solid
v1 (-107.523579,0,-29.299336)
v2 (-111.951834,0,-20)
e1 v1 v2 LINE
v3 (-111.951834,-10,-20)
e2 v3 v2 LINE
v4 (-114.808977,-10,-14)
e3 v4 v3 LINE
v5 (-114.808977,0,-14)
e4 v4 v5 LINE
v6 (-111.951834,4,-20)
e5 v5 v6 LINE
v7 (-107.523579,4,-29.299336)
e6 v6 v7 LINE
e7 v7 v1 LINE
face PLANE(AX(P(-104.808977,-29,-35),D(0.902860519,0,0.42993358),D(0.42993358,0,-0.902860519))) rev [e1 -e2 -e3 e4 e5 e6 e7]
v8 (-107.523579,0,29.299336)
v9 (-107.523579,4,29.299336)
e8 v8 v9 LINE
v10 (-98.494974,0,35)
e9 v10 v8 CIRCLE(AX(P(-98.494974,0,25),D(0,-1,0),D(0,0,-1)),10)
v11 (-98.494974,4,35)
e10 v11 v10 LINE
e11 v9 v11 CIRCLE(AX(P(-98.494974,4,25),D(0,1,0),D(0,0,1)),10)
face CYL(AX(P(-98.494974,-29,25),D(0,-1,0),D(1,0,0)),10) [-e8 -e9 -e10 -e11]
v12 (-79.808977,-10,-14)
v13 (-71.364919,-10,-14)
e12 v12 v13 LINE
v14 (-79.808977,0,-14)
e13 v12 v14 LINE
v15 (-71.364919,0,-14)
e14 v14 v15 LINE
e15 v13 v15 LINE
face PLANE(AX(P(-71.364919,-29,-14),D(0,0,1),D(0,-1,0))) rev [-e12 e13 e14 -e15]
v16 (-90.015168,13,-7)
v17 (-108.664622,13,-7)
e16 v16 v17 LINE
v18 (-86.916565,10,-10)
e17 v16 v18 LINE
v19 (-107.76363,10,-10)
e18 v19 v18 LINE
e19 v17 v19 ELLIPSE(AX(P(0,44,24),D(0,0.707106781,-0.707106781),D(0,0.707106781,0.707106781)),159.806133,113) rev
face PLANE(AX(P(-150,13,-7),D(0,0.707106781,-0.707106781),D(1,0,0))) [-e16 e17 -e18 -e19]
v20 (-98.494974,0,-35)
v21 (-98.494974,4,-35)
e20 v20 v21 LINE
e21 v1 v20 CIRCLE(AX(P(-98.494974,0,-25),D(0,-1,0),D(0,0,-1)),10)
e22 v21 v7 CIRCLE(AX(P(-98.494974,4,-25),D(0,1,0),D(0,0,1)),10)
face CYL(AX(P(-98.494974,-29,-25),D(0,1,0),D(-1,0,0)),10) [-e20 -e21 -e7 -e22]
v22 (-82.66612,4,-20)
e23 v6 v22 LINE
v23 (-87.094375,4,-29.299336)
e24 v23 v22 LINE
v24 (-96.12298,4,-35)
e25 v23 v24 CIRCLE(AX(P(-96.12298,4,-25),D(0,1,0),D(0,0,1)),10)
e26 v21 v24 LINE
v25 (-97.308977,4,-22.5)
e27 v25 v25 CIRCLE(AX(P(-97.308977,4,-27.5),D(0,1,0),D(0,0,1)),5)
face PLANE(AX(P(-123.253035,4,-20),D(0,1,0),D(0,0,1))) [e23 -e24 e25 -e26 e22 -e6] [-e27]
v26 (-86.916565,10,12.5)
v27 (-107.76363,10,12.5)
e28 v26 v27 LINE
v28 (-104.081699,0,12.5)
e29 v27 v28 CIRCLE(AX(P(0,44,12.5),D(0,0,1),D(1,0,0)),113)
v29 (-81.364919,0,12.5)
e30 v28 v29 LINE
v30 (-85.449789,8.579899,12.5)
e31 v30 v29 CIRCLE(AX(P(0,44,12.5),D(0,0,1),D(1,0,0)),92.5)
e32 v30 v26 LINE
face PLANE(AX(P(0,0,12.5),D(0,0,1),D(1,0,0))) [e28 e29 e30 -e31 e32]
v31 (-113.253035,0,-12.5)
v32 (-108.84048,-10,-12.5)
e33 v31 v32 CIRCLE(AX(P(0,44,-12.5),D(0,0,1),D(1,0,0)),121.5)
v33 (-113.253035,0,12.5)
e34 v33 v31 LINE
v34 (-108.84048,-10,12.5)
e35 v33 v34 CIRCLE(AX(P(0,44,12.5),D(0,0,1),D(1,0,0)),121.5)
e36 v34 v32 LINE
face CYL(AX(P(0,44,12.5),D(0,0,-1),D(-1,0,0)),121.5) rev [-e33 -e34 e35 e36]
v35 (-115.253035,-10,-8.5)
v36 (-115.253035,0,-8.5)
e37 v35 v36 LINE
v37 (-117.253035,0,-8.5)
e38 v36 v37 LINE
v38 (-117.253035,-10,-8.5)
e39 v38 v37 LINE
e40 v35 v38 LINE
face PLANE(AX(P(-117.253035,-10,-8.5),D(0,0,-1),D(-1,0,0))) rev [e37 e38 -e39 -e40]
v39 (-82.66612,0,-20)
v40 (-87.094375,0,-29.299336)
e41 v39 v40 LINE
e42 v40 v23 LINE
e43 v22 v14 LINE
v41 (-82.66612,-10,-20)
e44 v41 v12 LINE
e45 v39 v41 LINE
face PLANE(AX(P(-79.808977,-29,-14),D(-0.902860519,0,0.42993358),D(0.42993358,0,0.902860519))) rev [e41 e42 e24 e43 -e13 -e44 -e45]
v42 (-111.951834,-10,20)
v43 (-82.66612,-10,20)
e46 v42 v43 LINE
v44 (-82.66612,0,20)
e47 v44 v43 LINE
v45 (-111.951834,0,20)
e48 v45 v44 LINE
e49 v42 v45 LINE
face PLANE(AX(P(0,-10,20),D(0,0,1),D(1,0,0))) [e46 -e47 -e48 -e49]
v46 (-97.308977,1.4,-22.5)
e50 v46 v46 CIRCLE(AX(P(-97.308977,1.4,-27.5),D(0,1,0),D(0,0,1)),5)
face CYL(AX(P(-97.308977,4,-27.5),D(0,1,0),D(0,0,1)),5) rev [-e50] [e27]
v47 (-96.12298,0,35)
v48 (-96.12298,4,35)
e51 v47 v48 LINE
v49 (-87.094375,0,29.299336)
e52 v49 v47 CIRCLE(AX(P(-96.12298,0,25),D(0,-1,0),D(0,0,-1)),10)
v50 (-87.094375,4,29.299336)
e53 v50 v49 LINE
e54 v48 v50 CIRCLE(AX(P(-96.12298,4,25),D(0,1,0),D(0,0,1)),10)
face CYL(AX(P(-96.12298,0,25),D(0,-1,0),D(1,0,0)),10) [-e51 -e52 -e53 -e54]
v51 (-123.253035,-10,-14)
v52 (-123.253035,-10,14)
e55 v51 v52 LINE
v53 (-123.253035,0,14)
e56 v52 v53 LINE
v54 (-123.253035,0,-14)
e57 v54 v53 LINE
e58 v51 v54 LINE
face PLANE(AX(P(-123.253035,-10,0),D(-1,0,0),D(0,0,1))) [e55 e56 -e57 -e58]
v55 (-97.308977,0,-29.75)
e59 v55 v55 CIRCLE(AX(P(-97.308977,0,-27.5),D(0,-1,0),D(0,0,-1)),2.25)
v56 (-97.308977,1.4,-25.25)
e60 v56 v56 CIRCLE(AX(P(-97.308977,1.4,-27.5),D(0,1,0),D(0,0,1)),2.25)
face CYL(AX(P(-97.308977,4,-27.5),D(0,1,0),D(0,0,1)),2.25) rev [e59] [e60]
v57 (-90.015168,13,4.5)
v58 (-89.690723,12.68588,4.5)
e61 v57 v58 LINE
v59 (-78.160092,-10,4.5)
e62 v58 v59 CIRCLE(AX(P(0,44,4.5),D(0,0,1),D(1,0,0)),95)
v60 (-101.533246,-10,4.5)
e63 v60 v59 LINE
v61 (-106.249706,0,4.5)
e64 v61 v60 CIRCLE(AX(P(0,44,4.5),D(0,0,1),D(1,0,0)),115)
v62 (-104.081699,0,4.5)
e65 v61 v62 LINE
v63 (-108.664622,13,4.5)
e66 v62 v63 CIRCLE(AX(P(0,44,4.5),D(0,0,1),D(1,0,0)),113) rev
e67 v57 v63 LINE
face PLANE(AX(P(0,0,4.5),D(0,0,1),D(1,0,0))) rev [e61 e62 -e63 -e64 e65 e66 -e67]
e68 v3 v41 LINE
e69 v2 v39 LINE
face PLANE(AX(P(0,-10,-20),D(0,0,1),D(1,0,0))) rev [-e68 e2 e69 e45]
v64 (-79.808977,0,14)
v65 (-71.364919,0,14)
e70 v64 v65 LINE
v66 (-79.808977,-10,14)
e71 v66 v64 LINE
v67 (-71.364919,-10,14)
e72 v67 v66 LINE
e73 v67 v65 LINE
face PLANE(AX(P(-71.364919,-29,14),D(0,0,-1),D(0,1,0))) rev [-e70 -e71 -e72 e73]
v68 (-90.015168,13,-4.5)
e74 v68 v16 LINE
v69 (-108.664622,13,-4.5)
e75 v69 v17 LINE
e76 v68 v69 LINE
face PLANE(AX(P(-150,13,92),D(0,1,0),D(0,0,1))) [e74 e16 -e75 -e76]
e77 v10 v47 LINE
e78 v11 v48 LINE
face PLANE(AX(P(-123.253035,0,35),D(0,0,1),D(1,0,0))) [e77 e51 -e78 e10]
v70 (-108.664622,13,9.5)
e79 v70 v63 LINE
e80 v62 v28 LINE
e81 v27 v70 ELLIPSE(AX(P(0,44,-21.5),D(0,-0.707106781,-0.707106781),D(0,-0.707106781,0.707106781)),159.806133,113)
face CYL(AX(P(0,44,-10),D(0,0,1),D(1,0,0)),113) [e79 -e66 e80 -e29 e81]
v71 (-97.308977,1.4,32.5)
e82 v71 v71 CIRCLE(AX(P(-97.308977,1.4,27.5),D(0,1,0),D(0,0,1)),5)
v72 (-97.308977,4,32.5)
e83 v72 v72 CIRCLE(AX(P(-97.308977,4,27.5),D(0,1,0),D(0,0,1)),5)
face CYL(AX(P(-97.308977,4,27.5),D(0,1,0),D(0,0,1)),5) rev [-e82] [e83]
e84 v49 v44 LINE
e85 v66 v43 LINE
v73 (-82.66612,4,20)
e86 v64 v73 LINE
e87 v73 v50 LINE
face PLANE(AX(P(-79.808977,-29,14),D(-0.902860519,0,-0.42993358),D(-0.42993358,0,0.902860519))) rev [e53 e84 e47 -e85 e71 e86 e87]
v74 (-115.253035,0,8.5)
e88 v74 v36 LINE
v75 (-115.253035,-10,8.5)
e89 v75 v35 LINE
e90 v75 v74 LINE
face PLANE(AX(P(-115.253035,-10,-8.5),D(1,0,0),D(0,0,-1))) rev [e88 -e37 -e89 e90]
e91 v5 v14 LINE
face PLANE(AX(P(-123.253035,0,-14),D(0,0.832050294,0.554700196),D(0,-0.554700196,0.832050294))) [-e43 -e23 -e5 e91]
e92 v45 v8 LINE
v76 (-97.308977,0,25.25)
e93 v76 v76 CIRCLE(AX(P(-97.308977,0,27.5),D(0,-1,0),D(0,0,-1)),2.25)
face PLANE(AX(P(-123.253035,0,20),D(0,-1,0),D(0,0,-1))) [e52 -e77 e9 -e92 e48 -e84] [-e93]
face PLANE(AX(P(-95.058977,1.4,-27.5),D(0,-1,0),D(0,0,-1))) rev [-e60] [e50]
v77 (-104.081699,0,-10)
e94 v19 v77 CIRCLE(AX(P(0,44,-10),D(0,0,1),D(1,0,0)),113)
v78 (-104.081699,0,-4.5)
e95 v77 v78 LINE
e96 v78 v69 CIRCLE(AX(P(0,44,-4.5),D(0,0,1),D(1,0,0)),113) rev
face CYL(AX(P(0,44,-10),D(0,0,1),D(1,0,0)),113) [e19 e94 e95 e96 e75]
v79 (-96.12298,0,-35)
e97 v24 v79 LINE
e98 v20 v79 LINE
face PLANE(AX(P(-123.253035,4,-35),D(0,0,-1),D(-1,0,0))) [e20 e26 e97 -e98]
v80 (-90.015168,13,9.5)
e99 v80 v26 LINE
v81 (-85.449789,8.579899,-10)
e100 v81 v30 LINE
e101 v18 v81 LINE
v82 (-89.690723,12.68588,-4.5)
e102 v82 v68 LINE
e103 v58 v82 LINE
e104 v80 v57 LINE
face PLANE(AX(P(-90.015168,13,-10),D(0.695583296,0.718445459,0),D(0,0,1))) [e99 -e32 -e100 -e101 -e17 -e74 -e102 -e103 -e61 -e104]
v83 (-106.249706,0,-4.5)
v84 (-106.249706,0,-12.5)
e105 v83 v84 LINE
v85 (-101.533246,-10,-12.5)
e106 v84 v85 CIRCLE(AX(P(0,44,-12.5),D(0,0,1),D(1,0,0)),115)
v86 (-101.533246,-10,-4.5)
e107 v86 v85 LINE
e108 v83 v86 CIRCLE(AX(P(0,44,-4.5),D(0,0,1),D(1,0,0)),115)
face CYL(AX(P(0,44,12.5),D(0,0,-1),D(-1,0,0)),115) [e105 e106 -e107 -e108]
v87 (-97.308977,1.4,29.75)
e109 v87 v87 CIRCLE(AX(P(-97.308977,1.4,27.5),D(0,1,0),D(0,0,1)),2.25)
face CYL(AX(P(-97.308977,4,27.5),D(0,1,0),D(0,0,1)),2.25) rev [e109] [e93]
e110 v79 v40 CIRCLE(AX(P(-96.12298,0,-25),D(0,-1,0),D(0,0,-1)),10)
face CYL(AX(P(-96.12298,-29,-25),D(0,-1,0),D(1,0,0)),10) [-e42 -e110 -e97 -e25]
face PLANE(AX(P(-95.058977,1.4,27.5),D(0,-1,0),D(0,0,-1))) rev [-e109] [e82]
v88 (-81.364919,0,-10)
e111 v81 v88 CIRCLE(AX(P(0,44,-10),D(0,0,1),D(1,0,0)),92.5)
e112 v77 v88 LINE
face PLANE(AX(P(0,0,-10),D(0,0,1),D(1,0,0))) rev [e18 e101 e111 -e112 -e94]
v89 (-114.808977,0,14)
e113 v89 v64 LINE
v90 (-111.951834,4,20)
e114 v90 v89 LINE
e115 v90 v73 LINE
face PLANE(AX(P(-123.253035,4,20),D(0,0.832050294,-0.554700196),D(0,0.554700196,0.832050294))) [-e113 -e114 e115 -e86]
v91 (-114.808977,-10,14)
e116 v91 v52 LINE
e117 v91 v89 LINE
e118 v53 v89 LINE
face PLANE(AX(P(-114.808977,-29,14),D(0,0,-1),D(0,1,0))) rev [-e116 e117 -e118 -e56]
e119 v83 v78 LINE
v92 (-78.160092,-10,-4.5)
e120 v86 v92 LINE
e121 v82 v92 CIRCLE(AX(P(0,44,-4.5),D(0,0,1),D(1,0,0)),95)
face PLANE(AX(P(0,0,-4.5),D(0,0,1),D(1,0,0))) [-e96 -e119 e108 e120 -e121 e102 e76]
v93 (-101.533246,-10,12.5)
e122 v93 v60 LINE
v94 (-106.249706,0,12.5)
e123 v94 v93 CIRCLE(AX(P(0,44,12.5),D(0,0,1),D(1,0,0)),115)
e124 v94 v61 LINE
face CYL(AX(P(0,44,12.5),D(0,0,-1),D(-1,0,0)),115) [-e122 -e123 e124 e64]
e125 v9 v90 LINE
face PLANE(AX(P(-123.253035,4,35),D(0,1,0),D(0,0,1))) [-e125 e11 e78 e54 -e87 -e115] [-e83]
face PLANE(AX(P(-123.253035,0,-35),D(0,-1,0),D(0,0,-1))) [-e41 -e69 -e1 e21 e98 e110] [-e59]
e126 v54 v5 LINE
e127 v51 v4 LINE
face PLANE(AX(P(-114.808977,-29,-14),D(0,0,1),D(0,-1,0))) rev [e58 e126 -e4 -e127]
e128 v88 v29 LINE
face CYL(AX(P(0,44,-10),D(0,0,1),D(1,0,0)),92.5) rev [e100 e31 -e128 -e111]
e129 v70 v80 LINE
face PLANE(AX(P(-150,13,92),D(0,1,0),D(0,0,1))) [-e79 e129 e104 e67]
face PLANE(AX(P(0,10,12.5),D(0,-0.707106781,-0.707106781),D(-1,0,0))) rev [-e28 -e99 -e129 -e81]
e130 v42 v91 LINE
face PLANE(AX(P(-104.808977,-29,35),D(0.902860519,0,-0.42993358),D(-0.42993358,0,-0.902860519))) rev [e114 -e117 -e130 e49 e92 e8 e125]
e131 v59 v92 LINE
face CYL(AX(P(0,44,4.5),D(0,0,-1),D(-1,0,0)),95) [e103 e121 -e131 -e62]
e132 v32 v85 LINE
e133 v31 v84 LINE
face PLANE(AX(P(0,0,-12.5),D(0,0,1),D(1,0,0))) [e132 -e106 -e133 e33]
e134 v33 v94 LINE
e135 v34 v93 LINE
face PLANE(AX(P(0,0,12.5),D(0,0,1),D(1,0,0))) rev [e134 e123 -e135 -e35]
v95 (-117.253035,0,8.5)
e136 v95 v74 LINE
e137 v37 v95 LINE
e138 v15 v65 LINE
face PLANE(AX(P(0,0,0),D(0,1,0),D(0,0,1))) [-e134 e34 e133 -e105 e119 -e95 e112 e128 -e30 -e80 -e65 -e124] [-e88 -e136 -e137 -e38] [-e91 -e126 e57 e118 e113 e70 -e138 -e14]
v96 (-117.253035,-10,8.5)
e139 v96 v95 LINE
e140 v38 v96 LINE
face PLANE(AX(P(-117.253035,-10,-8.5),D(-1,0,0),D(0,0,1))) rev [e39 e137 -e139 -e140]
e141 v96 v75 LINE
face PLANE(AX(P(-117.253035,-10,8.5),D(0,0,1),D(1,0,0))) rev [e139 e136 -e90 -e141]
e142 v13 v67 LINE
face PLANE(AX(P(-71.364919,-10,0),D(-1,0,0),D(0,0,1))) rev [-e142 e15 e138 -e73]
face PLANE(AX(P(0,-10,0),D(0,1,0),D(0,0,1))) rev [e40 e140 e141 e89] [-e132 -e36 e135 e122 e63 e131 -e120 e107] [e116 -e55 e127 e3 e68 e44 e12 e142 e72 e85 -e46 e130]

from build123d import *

# Parameters (mm, degrees)
SCHIZZO2_W                                           = 51.888116
SCHIZZO2_H                                           = 40
ESTRUSIONE_ESTRUSIONE2_DEPTH                         = 10
ESTRUSIONE_ESTRUSIONE3_DEPTH                         = 12.5
ESTRUSIONE_ESTRUSIONE3_DEPTH_BACK                    = 10
SCHIZZO3_R                                           = 113
SCHIZZO3_R_2                                         = 105
SCHIZZO3_R_3                                         = 95
SCHIZZO3_R_4                                         = 92.5
TAGLIO_ESTRUSIONE1_DEPTH                             = 4.5
TAGLIO_ESTRUSIONE1_DEPTH_BACK                        = 4.5
SCHIZZO3_3_R                                         = 115
SCHIZZO3_3_R_2                                       = 113
SCHIZZO3_3_R_3                                       = 105
SCHIZZO3_3_R_4                                       = 95
TAGLIO_ESTRUSIONE2_DEPTH                             = 12.5
TAGLIO_ESTRUSIONE2_DEPTH_BACK                        = 12.5
SCHIZZO3_4_R                                         = 121.5
SCHIZZO3_4_R_2                                       = 115
TAGLIO_ESTRUSIONE3_DEPTH                             = 79.5
TAGLIO_ESTRUSIONE3_DEPTH_BACK                        = 79.5
ESTRUSIONE_ESTRUSIONE5_DEPTH                         = 51.888111
FORO_LAMATO_PER_VITE_M4_A_TESTA_CILINDRI_D           = 4.5
FORO_LAMATO_PER_VITE_M4_A_TESTA_CILINDRI_DEPTH       = 30
FORO_LAMATO_PER_VITE_M4_A_TESTA_CILINDRI_CBORE_D     = 10
FORO_LAMATO_PER_VITE_M4_A_TESTA_CILINDRI_CBORE_DEPTH = 2.6
FORO_LAMATO_PER_VITE_M4_A_TESTA_CILINDRI_TIP         = 1.351936393
SCHIZZO10_W                                          = 2
SCHIZZO10_H                                          = 17
TAGLIO_ESTRUSIONE4_DEPTH                             = 10
TAGLIO_ESTRUSIONE5_DEPTH                             = 33
RACCORDO1_R                                          = 10


with BuildPart() as part:
    # Schizzo2 → Estrusione-Estrusione2 (new body)
    with BuildSketch(Plane(origin=(0, 0, 0), x_dir=(1, 0, 0), z_dir=(0, 1, 0))):
        with Locations((-97.308977, 0)):
            Rectangle(SCHIZZO2_W, SCHIZZO2_H)
    extrude(amount=-ESTRUSIONE_ESTRUSIONE2_DEPTH)

    # Schizzo3 → Estrusione-Estrusione3 (add, two sides: drawn at the far end of the back side and taken through both)
    # profile 1 of 3: a face of its own
    with BuildSketch(Plane.XY.offset(-ESTRUSIONE_ESTRUSIONE3_DEPTH_BACK)):
        with Locations((0, 44)):
            Circle(SCHIZZO3_R)
        with Locations((0, 44)):
            Circle(SCHIZZO3_R_2, mode=Mode.SUBTRACT)
    # profile 2 of 3: a face of its own
    with BuildSketch(Plane.XY.offset(-ESTRUSIONE_ESTRUSIONE3_DEPTH_BACK)):
        with Locations((0, 44)):
            Circle(SCHIZZO3_R_2)
        with Locations((0, 44)):
            Circle(SCHIZZO3_R_3, mode=Mode.SUBTRACT)
    # profile 3 of 3: a face of its own
    with BuildSketch(Plane.XY.offset(-ESTRUSIONE_ESTRUSIONE3_DEPTH_BACK)):
        with Locations((0, 44)):
            Circle(SCHIZZO3_R_3)
        with Locations((0, 44)):
            Circle(SCHIZZO3_R_4, mode=Mode.SUBTRACT)
    extrude(amount=ESTRUSIONE_ESTRUSIONE3_DEPTH + ESTRUSIONE_ESTRUSIONE3_DEPTH_BACK)

    # Schizzo3<3> → Taglio-Estrusione1 (cut, two sides: drawn at the far end of the back side and taken through both)
    # profile 1 of 3: a face of its own
    with BuildSketch(Plane.XY.offset(-TAGLIO_ESTRUSIONE1_DEPTH_BACK)):
        with Locations((0, 44)):
            Circle(SCHIZZO3_3_R)
        with Locations((0, 44)):
            Circle(SCHIZZO3_3_R_2, mode=Mode.SUBTRACT)
    # profile 2 of 3: a face of its own
    with BuildSketch(Plane.XY.offset(-TAGLIO_ESTRUSIONE1_DEPTH_BACK)):
        with Locations((0, 44)):
            Circle(SCHIZZO3_3_R_2)
        with Locations((0, 44)):
            Circle(SCHIZZO3_3_R_3, mode=Mode.SUBTRACT)
    # profile 3 of 3: a face of its own
    with BuildSketch(Plane.XY.offset(-TAGLIO_ESTRUSIONE1_DEPTH_BACK)):
        with Locations((0, 44)):
            Circle(SCHIZZO3_3_R_3)
        with Locations((0, 44)):
            Circle(SCHIZZO3_3_R_4, mode=Mode.SUBTRACT)
    extrude(amount=TAGLIO_ESTRUSIONE1_DEPTH + TAGLIO_ESTRUSIONE1_DEPTH_BACK, mode=Mode.SUBTRACT)

    # Schizzo3<4> → Taglio-Estrusione2 (cut, two sides: drawn at the far end of the back side and taken through both)
    with BuildSketch(Plane.XY.offset(-TAGLIO_ESTRUSIONE2_DEPTH_BACK)):
        with Locations((0, 44)):
            Circle(SCHIZZO3_4_R)
        with Locations((0, 44)):
            Circle(SCHIZZO3_4_R_2, mode=Mode.SUBTRACT)
    extrude(amount=TAGLIO_ESTRUSIONE2_DEPTH + TAGLIO_ESTRUSIONE2_DEPTH_BACK, mode=Mode.SUBTRACT)

    # Schizzo4 → Taglio-Estrusione3 (cut, two sides: drawn at the far end of the back side and taken through both)
    with BuildSketch(Plane.XY.offset(12.5).offset(-TAGLIO_ESTRUSIONE3_DEPTH_BACK)):
        Polygon((150, 13), (150, -10), (150, -80), (-150, -80), (-150, -10), (0, -10), (0, 13), (-150, 13), (-150, 163), (150, 163), align=None)
    extrude(amount=TAGLIO_ESTRUSIONE3_DEPTH + TAGLIO_ESTRUSIONE3_DEPTH_BACK, mode=Mode.SUBTRACT)

    # Smusso1
    # the kernel refuses this chamfer: 4.942054941, 3 mm, written as the material it takes off along each edge
    with BuildSketch(Plane(origin=(-87.150731494, 13, 24.790313744), x_dir=(-0.998955732576957, 0.045688558213574655, 0), z_dir=(0, 0, -1))) as smusso1_piece_1:
        with BuildLine():
            Line((3.009603279, 0), (-2.049272113, -4.468643386))
            Line((-2.049272113, -4.468643386), (-2.138755111, -4.426662964))
            ThreePointArc((-2.138755111, -4.426662964), (-1.049342002, -2.223465239), (-0.091514438, 0.037345286))
            Line((-0.091514438, 0.037345286), (0.004515907, 0.098737882))
            ThreePointArc((0.004515907, 0.098737882), (1.506176357, 0.030057461), (3.014119187, 0.098737882))
            Line((3.014119187, 0.098737882), (3.009603279, 0))
        make_face()
    extrude(amount=47.080627488, mode=Mode.SUBTRACT)
    # the kernel refuses this chamfer: 4.942054941, 3 mm, written as the material it takes off along each edge
    with BuildSketch(Plane(origin=(-116.379670622, 13, -10), x_dir=(0, -0.9996219169112969, -0.02749587661058621), z_dir=(1, 0, 0))) as smusso1_2_piece_1:
        with BuildLine():
            Line((3.086019586, 0), (-0.169641465, -3.081353381))
            Line((-0.169641465, -3.081353381), (-0.22961878, -3.079703628))
            ThreePointArc((-0.22961878, -3.079703628), (-0.102387681, -1.540193489), (-0.059977315, 0.001649753))
            Line((-0.059977315, 0.001649753), (0.001649753, 0.059977315))
            ThreePointArc((0.001649753, 0.059977315), (1.543492994, 0.017566949), (3.087669338, 0.059977315))
            Line((3.087669338, 0.059977315), (3.086019586, 0))
        make_face()
    extrude(amount=34.07955152, mode=Mode.SUBTRACT)
    with BuildSketch(Plane(origin=(-116.379670622, 13, 12.5), x_dir=(0, -0.9996219169112969, 0.02749587661058621), z_dir=(1, 0, 0))) as smusso1_2_piece_2:
        with BuildLine():
            Line((3.086019586, 0), (-0.169641465, 3.081353381))
            Line((-0.169641465, 3.081353381), (-0.22961878, 3.079703628))
            ThreePointArc((-0.22961878, 3.079703628), (-0.102387681, 1.540193489), (-0.059977315, -0.001649753))
            Line((-0.059977315, -0.001649753), (0.001649753, -0.059977315))
            ThreePointArc((0.001649753, -0.059977315), (1.543492994, -0.017566949), (3.087669338, -0.059977315))
            Line((3.087669338, -0.059977315), (3.086019586, 0))
        make_face()
    extrude(amount=34.07955152, mode=Mode.SUBTRACT)

    # Schizzo7 → Estrusione-Estrusione5 (add)
    with BuildSketch(Plane(origin=(-71.364919, 0, 0), x_dir=(0, 0, -1), z_dir=(1, 0, 0))):
        Polygon((-20, 0), (-35, 0), (-35, 4), (-20, 4), (-14, 0), align=None)
        Polygon((20, 4), (35, 4), (35, 0), (20, 0), (14, 0), align=None)
    extrude(amount=-ESTRUSIONE_ESTRUSIONE5_DEPTH)

    # Foro lamato per Vite M4 a testa cilindrica piana-1
    with Locations(Plane(origin=(0, 4, 0), x_dir=(1, 0, 0), z_dir=(0, 1, 0))):
        with Locations((-97.308977, -27.5), (-97.308977, 27.5)):
            CounterBoreHole(FORO_LAMATO_PER_VITE_M4_A_TESTA_CILINDRI_D / 2, FORO_LAMATO_PER_VITE_M4_A_TESTA_CILINDRI_CBORE_D / 2, FORO_LAMATO_PER_VITE_M4_A_TESTA_CILINDRI_CBORE_DEPTH, depth=FORO_LAMATO_PER_VITE_M4_A_TESTA_CILINDRI_DEPTH)
            with Locations((0, 0, -(FORO_LAMATO_PER_VITE_M4_A_TESTA_CILINDRI_DEPTH + FORO_LAMATO_PER_VITE_M4_A_TESTA_CILINDRI_TIP / 2))):  # 118° drill point
                Cone(0, FORO_LAMATO_PER_VITE_M4_A_TESTA_CILINDRI_D / 2, FORO_LAMATO_PER_VITE_M4_A_TESTA_CILINDRI_TIP, mode=Mode.SUBTRACT)

    # Schizzo10 → Taglio-Estrusione4 (cut)
    with BuildSketch(Plane(origin=(0, 0, 0), x_dir=(1, 0, 0), z_dir=(0, 1, 0))):
        with Locations((-116.253035279, 0)):
            Rectangle(SCHIZZO10_W, SCHIZZO10_H)
    extrude(amount=-TAGLIO_ESTRUSIONE4_DEPTH, mode=Mode.SUBTRACT)

    # Schizzo11 → Taglio-Estrusione5 (cut)
    with BuildSketch(Plane(origin=(0, 4, 0), x_dir=(1, 0, 0), z_dir=(0, 1, 0))):
        Polygon((-123.253035, 14), (-123.253035, 35), (-104.808977, 35), (-114.808977, 14), align=None)
        Polygon((-89.808977, 35), (-71.364919, 35), (-71.364919, 14), (-79.808977, 14), align=None)
        Polygon((-123.253035, -14), (-123.253035, -35), (-104.808977, -35), (-114.808977, -14), align=None)
        Polygon((-89.808977, -35), (-71.364919, -35), (-71.364919, -14), (-79.808977, -14), align=None)
    extrude(amount=-TAGLIO_ESTRUSIONE5_DEPTH, mode=Mode.SUBTRACT)

    # Raccordo1
    raccordo1_edges = [part.edges().sort_by_distance(p)[0] for p in [
        (-104.808977, 2, -35),
        (-89.808977, 2, -35),
        (-104.808977, 2, 35),
        (-89.808977, 2, 35),
    ]]
    fillet(raccordo1_edges, radius=RACCORDO1_R)


solid = part.part
